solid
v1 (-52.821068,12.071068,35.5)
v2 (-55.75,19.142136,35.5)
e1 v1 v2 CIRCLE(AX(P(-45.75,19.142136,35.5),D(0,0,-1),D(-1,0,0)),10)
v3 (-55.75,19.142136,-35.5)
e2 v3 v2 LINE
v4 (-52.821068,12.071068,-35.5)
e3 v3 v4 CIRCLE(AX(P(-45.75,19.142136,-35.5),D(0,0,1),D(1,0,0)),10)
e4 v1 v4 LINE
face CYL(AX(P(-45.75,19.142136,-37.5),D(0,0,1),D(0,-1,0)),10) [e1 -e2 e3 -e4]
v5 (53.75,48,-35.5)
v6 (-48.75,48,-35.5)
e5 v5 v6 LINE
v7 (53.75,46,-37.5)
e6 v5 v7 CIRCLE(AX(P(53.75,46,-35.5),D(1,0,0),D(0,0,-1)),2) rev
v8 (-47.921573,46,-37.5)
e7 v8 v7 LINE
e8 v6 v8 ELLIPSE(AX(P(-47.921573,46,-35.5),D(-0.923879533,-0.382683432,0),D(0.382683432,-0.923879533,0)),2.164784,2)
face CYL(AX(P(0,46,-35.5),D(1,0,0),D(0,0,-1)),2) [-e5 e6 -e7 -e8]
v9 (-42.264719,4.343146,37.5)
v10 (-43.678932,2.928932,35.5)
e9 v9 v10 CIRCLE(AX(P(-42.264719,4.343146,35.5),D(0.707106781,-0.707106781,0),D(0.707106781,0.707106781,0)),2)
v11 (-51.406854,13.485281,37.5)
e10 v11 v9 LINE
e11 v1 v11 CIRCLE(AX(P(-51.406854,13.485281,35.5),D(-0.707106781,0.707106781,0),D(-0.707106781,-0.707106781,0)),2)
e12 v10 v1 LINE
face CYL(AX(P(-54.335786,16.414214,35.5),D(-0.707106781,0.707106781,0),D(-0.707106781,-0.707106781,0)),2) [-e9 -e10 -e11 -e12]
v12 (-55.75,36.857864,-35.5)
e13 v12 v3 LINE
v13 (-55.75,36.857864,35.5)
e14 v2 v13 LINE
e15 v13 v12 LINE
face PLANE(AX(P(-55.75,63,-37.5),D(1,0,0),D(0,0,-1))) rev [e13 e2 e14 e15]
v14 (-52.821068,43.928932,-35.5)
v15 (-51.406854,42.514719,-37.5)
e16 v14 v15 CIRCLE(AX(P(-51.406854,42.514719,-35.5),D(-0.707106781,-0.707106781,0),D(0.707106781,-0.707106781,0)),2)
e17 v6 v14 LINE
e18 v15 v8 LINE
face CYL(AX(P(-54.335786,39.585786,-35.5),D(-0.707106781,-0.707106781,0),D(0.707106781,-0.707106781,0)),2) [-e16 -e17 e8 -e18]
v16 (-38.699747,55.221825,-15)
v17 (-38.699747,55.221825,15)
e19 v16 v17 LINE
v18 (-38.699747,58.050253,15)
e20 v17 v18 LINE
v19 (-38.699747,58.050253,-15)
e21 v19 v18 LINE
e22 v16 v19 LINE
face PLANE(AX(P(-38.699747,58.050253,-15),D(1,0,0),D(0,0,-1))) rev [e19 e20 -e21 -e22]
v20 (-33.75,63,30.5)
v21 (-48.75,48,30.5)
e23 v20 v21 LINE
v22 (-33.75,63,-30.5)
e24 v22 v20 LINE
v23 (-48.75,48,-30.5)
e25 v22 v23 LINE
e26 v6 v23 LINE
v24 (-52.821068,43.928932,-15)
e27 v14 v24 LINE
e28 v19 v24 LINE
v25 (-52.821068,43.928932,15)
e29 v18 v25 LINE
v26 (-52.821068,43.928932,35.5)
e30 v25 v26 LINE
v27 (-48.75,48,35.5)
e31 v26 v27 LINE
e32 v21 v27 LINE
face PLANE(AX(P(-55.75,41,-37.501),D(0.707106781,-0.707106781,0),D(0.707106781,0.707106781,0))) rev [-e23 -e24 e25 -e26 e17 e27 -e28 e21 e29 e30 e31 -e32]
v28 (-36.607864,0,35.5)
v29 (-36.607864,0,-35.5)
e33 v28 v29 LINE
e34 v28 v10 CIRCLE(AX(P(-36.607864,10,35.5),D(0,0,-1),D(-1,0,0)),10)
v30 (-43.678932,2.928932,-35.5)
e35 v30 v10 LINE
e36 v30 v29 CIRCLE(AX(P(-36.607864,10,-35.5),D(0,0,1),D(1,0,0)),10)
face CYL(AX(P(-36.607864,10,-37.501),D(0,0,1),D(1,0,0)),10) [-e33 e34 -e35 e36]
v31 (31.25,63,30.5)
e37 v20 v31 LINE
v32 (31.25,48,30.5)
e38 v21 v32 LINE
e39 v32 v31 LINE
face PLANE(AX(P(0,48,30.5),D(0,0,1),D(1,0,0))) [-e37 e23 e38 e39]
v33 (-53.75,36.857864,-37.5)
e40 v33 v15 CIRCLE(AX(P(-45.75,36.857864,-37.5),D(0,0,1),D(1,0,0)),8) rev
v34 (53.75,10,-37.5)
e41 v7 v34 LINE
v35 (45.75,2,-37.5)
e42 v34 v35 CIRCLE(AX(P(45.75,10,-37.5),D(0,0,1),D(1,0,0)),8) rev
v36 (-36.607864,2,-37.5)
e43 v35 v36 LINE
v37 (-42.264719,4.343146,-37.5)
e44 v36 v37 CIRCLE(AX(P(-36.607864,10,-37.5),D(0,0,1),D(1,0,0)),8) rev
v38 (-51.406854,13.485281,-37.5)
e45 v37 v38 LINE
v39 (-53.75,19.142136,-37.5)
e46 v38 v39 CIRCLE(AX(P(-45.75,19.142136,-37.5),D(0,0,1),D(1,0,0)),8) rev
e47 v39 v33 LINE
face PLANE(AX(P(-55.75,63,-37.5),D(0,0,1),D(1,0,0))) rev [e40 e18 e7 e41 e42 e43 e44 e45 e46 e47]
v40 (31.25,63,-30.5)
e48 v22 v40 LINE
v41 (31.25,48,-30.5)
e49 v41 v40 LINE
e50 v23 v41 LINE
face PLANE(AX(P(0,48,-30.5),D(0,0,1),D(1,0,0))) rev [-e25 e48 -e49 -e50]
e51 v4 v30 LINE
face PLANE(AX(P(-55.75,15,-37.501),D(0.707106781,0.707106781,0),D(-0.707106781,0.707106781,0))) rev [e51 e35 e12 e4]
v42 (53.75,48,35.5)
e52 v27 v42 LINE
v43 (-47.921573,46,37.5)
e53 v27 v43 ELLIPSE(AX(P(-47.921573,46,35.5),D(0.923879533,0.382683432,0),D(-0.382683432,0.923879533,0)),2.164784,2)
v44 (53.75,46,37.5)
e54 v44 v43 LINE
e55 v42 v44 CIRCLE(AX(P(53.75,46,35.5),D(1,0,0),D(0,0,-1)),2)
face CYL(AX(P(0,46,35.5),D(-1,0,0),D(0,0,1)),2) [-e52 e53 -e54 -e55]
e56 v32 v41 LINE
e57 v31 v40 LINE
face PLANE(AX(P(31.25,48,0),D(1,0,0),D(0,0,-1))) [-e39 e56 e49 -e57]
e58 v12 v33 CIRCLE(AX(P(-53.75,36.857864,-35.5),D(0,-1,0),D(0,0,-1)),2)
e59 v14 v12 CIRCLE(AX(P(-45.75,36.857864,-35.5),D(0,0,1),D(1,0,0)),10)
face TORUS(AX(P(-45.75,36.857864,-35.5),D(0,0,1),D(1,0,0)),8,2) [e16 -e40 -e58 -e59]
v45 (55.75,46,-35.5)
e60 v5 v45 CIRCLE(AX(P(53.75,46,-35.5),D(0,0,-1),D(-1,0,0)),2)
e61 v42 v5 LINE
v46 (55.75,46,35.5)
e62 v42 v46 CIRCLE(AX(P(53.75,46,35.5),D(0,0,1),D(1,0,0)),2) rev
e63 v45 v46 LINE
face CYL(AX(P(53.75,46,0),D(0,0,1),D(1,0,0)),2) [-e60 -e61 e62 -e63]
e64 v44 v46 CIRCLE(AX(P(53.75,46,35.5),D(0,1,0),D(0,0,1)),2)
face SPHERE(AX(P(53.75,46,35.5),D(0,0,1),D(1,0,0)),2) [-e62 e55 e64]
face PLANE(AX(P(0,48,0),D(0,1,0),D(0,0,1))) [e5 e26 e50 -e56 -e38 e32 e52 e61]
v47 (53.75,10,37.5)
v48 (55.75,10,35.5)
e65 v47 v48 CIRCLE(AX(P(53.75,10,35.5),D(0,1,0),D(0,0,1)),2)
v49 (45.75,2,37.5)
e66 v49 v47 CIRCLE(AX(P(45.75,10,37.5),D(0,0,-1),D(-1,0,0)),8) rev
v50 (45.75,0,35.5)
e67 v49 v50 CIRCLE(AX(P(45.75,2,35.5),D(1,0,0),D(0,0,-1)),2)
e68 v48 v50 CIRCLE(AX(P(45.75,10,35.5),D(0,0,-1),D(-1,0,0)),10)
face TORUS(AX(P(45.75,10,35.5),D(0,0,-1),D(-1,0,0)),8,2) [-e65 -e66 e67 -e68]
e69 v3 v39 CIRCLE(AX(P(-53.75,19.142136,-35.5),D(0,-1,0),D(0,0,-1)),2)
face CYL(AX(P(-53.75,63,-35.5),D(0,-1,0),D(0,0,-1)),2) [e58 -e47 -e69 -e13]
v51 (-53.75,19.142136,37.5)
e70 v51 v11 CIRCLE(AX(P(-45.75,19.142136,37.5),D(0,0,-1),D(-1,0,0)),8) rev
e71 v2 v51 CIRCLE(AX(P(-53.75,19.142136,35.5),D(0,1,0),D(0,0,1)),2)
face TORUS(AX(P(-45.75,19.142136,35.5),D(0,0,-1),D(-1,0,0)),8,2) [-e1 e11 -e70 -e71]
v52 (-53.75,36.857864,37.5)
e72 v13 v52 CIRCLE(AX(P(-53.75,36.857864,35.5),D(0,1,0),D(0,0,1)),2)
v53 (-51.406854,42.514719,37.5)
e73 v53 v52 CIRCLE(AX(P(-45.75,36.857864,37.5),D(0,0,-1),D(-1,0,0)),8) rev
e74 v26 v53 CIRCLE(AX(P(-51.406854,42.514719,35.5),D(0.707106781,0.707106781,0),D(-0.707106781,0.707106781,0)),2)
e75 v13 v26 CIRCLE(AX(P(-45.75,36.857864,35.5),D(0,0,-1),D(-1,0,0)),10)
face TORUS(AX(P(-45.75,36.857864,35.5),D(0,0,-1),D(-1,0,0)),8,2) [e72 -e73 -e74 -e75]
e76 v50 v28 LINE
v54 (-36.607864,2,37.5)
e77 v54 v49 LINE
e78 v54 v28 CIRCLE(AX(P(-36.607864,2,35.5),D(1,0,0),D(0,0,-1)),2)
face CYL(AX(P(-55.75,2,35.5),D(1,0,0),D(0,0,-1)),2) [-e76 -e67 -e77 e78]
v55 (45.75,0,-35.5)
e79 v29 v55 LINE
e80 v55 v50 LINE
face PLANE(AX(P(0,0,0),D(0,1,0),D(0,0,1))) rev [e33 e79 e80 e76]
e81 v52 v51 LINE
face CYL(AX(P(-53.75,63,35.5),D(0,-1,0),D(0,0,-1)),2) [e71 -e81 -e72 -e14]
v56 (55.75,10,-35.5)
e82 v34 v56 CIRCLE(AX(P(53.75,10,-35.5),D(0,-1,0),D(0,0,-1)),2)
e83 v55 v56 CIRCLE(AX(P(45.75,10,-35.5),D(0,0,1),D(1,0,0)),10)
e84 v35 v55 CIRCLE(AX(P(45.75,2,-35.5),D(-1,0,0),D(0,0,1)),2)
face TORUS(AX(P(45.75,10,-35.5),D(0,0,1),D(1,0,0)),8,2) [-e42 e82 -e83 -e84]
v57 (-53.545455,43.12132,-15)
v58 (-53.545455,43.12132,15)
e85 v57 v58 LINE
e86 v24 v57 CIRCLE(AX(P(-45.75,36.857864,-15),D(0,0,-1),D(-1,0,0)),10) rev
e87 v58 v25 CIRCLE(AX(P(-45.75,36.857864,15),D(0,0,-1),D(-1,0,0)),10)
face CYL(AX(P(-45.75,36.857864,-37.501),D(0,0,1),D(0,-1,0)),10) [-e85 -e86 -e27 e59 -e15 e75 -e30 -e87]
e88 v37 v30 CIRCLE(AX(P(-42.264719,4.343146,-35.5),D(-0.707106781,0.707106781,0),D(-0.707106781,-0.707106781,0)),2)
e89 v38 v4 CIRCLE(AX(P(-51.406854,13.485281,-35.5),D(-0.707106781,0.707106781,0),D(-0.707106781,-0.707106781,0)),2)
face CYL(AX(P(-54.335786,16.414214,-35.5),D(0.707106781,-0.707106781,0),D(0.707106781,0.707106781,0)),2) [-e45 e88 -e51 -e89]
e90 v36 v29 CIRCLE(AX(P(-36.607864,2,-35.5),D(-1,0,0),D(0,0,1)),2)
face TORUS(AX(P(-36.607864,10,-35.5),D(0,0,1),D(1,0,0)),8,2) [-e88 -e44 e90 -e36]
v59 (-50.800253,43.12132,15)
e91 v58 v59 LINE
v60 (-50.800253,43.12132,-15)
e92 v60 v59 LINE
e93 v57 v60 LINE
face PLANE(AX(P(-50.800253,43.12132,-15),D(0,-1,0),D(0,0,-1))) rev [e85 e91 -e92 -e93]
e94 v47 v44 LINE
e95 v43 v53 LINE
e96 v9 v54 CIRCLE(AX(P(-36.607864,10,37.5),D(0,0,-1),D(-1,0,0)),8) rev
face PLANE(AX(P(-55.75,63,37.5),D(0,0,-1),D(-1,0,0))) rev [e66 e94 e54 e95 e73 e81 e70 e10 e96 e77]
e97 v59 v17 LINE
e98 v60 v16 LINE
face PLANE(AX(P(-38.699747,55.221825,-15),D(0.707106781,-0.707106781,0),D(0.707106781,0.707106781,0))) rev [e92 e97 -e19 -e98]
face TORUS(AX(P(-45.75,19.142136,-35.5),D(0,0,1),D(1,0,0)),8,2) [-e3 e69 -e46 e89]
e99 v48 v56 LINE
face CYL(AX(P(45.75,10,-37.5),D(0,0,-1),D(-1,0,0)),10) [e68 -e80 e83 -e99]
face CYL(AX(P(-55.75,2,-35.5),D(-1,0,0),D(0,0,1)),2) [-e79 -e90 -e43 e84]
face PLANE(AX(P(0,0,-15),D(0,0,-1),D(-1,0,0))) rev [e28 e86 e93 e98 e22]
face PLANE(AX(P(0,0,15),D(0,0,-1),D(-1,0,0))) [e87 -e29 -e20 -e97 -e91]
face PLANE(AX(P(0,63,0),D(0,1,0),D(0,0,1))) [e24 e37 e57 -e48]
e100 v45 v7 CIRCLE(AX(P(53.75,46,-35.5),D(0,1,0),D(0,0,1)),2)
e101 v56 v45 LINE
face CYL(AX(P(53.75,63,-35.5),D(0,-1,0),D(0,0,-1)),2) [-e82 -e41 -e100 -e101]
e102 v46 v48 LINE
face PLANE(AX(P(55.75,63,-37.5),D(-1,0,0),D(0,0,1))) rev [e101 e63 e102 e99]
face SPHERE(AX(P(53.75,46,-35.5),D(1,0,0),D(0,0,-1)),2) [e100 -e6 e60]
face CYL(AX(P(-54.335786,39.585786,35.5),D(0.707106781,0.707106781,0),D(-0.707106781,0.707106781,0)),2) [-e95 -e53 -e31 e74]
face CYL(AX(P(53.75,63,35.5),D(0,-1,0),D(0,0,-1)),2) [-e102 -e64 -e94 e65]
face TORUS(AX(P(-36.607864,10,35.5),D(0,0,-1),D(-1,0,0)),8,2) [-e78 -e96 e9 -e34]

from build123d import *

# Parameters (mm, degrees)
SKETCH1_W           = 111.5
SKETCH1_H           = 75
BOSS_EXTRUDE1_DEPTH = 63
CUT_EXTRUDE1_REACH  = 114.703
SKETCH3_W           = 22
SKETCH3_H           = 7
CUT_EXTRUDE2_DEPTH  = 15
CUT_EXTRUDE3_DEPTH  = 15
FILLET1_R           = 10
FILLET2_R           = 2


with BuildPart() as part:
    # Sketch1 → Boss-Extrude1 (new body)
    with BuildSketch(Plane(origin=(0, 0, 0), x_dir=(1, 0, 0), z_dir=(0, 1, 0))):
        Rectangle(SKETCH1_W, SKETCH1_H)
    extrude(amount=BOSS_EXTRUDE1_DEPTH)

    # Sketch2 → Cut-Extrude1 (cut, up to next)
    with BuildSketch(Plane.XY.offset(37.5), mode=Mode.PRIVATE) as cut_extrude1_sk1:
        Polygon((-55.75, 41), (-33.75, 63), (-55.75, 63), align=None)
    cut_extrude1_tool1 = extrude(cut_extrude1_sk1.sketch, amount=-CUT_EXTRUDE1_REACH, mode=Mode.PRIVATE) & part.part
    # Sketch2 → Cut-Extrude1 (cut, up to next)
    with BuildSketch(Plane.XY.offset(37.5), mode=Mode.PRIVATE) as cut_extrude1_sk2:
        Polygon((-55.75, 15), (-40.75, 0), (-55.75, 0), align=None)
    cut_extrude1_tool2 = extrude(cut_extrude1_sk2.sketch, amount=-CUT_EXTRUDE1_REACH, mode=Mode.PRIVATE) & part.part
    add(cut_extrude1_tool1.solids().sort_by_distance((-48.416667, 55.666667, 37.5))[0], mode=Mode.SUBTRACT)
    add(cut_extrude1_tool2.solids().sort_by_distance((-50.75, 5, 37.5))[0], mode=Mode.SUBTRACT)

    # Sketch3 → Cut-Extrude2 (cut)
    with BuildSketch(Plane(origin=(0, 63, 0), x_dir=(1, 0, 0), z_dir=(0, 1, 0))):
        Polygon((31.25, -30.5), (-33.75, -30.5), (-33.75, -37.5), (55.75, -37.5), (55.75, 37.5), (-33.75, 37.5), (-33.75, 30.5), (31.25, 30.5), align=None)
        with Locations((-44.75, -34)):
            Rectangle(SKETCH3_W, SKETCH3_H)
        with Locations((-44.75, 34)):
            Rectangle(SKETCH3_W, SKETCH3_H)
    extrude(amount=-CUT_EXTRUDE2_DEPTH, mode=Mode.SUBTRACT)

    # Sketch4 → Cut-Extrude3 (cut, symmetric)
    with BuildSketch(Plane.XY):
        Polygon((-53.628679656, 43.121320344), (-38.699747468, 58.050252532), (-38.699747468, 55.221825407), (-50.800252532, 43.121320344), align=None)
    extrude(amount=CUT_EXTRUDE3_DEPTH, both=True, mode=Mode.SUBTRACT)

    # Fillet1
    # the kernel refuses this fillet: 10 mm, written as the material it takes off along each edge
    with BuildSketch(Plane(origin=(-55.75, 41, 47.855339059), x_dir=(0.7071067811865432, 0.7071067811865519, 0), z_dir=(0, 0, -1)), Plane(origin=(-40.75, 0, 47.855339059), x_dir=(-0.707106781186546, 0.707106781186549, 0), z_dir=(0, 0, -1))) as fillet1_piece_1:
        with BuildLine():
            CenterArc((FILLET1_R * 0.414213562373, FILLET1_R), FILLET1_R, 225, 45)
            Line((-FILLET1_R * 0.292893218813, FILLET1_R * 0.292893218813), (0, 0))
            Line((0, 0), (FILLET1_R * 0.414213562373, 0))
        make_face()
    extrude(amount=95.710678119, mode=Mode.SUBTRACT)
    with BuildSketch(Plane(origin=(-55.75, 15, 47.855339059), x_dir=(0.7071067811865466, -0.7071067811865482, 0), z_dir=(0, 0, -1))) as fillet1_piece_2:
        with BuildLine():
            CenterArc((FILLET1_R * 0.414213562373, -FILLET1_R), FILLET1_R, 90, 45)
            Line((-FILLET1_R * 0.292893218813, -FILLET1_R * 0.292893218813), (0, 0))
            Line((0, 0), (FILLET1_R * 0.414213562373, 0))
        make_face()
    extrude(amount=95.710678119, mode=Mode.SUBTRACT)
    with BuildSketch(Plane(origin=(55.75, 0, -62.5), x_dir=(-1, 0, 0), z_dir=(0, 0, 1))) as fillet1_piece_3:
        with BuildLine():
            CenterArc((FILLET1_R, -FILLET1_R), FILLET1_R, 90, 90)
            Line((0, -FILLET1_R), (0, 0))
            Line((0, 0), (FILLET1_R, 0))
        make_face()
    extrude(amount=125, mode=Mode.SUBTRACT)

    # Fillet2
    fillet2_edges = [part.edges().sort_by_distance(p)[0] for p in [
        (4.571067812, 0, -37.5),
        (-48.25, 7.5, -37.5),
        (52.821067812, 2.928932188, -37.5),
        (-40.4346987, 0.761204675, -37.5),
        (-54.988795325, 15.3153013, -37.5),
        (-54.988795325, 40.6846987, -37.5),
        (-50.785533906, 45.964466094, -37.5),
        (55.75, 29, 37.5),
        (55.75, 29, -37.5),
        (3.5, 48, -37.5),
        (3.5, 48, 37.5),
        (55.75, 48, 0),
        (-50.785533906, 45.964466094, 37.5),
        (-55.75, 28, 37.5),
        (-48.25, 7.5, 37.5),
        (4.571067812, 0, 37.5),
        (52.821067812, 2.928932188, 37.5),
        (-40.4346987, 0.761204675, 37.5),
        (-54.988795325, 15.3153013, 37.5),
        (-54.988795325, 40.6846987, 37.5),
        (-55.75, 28, -37.5),
    ]]
    fillet(fillet2_edges, radius=FILLET2_R)


solid = part.part
